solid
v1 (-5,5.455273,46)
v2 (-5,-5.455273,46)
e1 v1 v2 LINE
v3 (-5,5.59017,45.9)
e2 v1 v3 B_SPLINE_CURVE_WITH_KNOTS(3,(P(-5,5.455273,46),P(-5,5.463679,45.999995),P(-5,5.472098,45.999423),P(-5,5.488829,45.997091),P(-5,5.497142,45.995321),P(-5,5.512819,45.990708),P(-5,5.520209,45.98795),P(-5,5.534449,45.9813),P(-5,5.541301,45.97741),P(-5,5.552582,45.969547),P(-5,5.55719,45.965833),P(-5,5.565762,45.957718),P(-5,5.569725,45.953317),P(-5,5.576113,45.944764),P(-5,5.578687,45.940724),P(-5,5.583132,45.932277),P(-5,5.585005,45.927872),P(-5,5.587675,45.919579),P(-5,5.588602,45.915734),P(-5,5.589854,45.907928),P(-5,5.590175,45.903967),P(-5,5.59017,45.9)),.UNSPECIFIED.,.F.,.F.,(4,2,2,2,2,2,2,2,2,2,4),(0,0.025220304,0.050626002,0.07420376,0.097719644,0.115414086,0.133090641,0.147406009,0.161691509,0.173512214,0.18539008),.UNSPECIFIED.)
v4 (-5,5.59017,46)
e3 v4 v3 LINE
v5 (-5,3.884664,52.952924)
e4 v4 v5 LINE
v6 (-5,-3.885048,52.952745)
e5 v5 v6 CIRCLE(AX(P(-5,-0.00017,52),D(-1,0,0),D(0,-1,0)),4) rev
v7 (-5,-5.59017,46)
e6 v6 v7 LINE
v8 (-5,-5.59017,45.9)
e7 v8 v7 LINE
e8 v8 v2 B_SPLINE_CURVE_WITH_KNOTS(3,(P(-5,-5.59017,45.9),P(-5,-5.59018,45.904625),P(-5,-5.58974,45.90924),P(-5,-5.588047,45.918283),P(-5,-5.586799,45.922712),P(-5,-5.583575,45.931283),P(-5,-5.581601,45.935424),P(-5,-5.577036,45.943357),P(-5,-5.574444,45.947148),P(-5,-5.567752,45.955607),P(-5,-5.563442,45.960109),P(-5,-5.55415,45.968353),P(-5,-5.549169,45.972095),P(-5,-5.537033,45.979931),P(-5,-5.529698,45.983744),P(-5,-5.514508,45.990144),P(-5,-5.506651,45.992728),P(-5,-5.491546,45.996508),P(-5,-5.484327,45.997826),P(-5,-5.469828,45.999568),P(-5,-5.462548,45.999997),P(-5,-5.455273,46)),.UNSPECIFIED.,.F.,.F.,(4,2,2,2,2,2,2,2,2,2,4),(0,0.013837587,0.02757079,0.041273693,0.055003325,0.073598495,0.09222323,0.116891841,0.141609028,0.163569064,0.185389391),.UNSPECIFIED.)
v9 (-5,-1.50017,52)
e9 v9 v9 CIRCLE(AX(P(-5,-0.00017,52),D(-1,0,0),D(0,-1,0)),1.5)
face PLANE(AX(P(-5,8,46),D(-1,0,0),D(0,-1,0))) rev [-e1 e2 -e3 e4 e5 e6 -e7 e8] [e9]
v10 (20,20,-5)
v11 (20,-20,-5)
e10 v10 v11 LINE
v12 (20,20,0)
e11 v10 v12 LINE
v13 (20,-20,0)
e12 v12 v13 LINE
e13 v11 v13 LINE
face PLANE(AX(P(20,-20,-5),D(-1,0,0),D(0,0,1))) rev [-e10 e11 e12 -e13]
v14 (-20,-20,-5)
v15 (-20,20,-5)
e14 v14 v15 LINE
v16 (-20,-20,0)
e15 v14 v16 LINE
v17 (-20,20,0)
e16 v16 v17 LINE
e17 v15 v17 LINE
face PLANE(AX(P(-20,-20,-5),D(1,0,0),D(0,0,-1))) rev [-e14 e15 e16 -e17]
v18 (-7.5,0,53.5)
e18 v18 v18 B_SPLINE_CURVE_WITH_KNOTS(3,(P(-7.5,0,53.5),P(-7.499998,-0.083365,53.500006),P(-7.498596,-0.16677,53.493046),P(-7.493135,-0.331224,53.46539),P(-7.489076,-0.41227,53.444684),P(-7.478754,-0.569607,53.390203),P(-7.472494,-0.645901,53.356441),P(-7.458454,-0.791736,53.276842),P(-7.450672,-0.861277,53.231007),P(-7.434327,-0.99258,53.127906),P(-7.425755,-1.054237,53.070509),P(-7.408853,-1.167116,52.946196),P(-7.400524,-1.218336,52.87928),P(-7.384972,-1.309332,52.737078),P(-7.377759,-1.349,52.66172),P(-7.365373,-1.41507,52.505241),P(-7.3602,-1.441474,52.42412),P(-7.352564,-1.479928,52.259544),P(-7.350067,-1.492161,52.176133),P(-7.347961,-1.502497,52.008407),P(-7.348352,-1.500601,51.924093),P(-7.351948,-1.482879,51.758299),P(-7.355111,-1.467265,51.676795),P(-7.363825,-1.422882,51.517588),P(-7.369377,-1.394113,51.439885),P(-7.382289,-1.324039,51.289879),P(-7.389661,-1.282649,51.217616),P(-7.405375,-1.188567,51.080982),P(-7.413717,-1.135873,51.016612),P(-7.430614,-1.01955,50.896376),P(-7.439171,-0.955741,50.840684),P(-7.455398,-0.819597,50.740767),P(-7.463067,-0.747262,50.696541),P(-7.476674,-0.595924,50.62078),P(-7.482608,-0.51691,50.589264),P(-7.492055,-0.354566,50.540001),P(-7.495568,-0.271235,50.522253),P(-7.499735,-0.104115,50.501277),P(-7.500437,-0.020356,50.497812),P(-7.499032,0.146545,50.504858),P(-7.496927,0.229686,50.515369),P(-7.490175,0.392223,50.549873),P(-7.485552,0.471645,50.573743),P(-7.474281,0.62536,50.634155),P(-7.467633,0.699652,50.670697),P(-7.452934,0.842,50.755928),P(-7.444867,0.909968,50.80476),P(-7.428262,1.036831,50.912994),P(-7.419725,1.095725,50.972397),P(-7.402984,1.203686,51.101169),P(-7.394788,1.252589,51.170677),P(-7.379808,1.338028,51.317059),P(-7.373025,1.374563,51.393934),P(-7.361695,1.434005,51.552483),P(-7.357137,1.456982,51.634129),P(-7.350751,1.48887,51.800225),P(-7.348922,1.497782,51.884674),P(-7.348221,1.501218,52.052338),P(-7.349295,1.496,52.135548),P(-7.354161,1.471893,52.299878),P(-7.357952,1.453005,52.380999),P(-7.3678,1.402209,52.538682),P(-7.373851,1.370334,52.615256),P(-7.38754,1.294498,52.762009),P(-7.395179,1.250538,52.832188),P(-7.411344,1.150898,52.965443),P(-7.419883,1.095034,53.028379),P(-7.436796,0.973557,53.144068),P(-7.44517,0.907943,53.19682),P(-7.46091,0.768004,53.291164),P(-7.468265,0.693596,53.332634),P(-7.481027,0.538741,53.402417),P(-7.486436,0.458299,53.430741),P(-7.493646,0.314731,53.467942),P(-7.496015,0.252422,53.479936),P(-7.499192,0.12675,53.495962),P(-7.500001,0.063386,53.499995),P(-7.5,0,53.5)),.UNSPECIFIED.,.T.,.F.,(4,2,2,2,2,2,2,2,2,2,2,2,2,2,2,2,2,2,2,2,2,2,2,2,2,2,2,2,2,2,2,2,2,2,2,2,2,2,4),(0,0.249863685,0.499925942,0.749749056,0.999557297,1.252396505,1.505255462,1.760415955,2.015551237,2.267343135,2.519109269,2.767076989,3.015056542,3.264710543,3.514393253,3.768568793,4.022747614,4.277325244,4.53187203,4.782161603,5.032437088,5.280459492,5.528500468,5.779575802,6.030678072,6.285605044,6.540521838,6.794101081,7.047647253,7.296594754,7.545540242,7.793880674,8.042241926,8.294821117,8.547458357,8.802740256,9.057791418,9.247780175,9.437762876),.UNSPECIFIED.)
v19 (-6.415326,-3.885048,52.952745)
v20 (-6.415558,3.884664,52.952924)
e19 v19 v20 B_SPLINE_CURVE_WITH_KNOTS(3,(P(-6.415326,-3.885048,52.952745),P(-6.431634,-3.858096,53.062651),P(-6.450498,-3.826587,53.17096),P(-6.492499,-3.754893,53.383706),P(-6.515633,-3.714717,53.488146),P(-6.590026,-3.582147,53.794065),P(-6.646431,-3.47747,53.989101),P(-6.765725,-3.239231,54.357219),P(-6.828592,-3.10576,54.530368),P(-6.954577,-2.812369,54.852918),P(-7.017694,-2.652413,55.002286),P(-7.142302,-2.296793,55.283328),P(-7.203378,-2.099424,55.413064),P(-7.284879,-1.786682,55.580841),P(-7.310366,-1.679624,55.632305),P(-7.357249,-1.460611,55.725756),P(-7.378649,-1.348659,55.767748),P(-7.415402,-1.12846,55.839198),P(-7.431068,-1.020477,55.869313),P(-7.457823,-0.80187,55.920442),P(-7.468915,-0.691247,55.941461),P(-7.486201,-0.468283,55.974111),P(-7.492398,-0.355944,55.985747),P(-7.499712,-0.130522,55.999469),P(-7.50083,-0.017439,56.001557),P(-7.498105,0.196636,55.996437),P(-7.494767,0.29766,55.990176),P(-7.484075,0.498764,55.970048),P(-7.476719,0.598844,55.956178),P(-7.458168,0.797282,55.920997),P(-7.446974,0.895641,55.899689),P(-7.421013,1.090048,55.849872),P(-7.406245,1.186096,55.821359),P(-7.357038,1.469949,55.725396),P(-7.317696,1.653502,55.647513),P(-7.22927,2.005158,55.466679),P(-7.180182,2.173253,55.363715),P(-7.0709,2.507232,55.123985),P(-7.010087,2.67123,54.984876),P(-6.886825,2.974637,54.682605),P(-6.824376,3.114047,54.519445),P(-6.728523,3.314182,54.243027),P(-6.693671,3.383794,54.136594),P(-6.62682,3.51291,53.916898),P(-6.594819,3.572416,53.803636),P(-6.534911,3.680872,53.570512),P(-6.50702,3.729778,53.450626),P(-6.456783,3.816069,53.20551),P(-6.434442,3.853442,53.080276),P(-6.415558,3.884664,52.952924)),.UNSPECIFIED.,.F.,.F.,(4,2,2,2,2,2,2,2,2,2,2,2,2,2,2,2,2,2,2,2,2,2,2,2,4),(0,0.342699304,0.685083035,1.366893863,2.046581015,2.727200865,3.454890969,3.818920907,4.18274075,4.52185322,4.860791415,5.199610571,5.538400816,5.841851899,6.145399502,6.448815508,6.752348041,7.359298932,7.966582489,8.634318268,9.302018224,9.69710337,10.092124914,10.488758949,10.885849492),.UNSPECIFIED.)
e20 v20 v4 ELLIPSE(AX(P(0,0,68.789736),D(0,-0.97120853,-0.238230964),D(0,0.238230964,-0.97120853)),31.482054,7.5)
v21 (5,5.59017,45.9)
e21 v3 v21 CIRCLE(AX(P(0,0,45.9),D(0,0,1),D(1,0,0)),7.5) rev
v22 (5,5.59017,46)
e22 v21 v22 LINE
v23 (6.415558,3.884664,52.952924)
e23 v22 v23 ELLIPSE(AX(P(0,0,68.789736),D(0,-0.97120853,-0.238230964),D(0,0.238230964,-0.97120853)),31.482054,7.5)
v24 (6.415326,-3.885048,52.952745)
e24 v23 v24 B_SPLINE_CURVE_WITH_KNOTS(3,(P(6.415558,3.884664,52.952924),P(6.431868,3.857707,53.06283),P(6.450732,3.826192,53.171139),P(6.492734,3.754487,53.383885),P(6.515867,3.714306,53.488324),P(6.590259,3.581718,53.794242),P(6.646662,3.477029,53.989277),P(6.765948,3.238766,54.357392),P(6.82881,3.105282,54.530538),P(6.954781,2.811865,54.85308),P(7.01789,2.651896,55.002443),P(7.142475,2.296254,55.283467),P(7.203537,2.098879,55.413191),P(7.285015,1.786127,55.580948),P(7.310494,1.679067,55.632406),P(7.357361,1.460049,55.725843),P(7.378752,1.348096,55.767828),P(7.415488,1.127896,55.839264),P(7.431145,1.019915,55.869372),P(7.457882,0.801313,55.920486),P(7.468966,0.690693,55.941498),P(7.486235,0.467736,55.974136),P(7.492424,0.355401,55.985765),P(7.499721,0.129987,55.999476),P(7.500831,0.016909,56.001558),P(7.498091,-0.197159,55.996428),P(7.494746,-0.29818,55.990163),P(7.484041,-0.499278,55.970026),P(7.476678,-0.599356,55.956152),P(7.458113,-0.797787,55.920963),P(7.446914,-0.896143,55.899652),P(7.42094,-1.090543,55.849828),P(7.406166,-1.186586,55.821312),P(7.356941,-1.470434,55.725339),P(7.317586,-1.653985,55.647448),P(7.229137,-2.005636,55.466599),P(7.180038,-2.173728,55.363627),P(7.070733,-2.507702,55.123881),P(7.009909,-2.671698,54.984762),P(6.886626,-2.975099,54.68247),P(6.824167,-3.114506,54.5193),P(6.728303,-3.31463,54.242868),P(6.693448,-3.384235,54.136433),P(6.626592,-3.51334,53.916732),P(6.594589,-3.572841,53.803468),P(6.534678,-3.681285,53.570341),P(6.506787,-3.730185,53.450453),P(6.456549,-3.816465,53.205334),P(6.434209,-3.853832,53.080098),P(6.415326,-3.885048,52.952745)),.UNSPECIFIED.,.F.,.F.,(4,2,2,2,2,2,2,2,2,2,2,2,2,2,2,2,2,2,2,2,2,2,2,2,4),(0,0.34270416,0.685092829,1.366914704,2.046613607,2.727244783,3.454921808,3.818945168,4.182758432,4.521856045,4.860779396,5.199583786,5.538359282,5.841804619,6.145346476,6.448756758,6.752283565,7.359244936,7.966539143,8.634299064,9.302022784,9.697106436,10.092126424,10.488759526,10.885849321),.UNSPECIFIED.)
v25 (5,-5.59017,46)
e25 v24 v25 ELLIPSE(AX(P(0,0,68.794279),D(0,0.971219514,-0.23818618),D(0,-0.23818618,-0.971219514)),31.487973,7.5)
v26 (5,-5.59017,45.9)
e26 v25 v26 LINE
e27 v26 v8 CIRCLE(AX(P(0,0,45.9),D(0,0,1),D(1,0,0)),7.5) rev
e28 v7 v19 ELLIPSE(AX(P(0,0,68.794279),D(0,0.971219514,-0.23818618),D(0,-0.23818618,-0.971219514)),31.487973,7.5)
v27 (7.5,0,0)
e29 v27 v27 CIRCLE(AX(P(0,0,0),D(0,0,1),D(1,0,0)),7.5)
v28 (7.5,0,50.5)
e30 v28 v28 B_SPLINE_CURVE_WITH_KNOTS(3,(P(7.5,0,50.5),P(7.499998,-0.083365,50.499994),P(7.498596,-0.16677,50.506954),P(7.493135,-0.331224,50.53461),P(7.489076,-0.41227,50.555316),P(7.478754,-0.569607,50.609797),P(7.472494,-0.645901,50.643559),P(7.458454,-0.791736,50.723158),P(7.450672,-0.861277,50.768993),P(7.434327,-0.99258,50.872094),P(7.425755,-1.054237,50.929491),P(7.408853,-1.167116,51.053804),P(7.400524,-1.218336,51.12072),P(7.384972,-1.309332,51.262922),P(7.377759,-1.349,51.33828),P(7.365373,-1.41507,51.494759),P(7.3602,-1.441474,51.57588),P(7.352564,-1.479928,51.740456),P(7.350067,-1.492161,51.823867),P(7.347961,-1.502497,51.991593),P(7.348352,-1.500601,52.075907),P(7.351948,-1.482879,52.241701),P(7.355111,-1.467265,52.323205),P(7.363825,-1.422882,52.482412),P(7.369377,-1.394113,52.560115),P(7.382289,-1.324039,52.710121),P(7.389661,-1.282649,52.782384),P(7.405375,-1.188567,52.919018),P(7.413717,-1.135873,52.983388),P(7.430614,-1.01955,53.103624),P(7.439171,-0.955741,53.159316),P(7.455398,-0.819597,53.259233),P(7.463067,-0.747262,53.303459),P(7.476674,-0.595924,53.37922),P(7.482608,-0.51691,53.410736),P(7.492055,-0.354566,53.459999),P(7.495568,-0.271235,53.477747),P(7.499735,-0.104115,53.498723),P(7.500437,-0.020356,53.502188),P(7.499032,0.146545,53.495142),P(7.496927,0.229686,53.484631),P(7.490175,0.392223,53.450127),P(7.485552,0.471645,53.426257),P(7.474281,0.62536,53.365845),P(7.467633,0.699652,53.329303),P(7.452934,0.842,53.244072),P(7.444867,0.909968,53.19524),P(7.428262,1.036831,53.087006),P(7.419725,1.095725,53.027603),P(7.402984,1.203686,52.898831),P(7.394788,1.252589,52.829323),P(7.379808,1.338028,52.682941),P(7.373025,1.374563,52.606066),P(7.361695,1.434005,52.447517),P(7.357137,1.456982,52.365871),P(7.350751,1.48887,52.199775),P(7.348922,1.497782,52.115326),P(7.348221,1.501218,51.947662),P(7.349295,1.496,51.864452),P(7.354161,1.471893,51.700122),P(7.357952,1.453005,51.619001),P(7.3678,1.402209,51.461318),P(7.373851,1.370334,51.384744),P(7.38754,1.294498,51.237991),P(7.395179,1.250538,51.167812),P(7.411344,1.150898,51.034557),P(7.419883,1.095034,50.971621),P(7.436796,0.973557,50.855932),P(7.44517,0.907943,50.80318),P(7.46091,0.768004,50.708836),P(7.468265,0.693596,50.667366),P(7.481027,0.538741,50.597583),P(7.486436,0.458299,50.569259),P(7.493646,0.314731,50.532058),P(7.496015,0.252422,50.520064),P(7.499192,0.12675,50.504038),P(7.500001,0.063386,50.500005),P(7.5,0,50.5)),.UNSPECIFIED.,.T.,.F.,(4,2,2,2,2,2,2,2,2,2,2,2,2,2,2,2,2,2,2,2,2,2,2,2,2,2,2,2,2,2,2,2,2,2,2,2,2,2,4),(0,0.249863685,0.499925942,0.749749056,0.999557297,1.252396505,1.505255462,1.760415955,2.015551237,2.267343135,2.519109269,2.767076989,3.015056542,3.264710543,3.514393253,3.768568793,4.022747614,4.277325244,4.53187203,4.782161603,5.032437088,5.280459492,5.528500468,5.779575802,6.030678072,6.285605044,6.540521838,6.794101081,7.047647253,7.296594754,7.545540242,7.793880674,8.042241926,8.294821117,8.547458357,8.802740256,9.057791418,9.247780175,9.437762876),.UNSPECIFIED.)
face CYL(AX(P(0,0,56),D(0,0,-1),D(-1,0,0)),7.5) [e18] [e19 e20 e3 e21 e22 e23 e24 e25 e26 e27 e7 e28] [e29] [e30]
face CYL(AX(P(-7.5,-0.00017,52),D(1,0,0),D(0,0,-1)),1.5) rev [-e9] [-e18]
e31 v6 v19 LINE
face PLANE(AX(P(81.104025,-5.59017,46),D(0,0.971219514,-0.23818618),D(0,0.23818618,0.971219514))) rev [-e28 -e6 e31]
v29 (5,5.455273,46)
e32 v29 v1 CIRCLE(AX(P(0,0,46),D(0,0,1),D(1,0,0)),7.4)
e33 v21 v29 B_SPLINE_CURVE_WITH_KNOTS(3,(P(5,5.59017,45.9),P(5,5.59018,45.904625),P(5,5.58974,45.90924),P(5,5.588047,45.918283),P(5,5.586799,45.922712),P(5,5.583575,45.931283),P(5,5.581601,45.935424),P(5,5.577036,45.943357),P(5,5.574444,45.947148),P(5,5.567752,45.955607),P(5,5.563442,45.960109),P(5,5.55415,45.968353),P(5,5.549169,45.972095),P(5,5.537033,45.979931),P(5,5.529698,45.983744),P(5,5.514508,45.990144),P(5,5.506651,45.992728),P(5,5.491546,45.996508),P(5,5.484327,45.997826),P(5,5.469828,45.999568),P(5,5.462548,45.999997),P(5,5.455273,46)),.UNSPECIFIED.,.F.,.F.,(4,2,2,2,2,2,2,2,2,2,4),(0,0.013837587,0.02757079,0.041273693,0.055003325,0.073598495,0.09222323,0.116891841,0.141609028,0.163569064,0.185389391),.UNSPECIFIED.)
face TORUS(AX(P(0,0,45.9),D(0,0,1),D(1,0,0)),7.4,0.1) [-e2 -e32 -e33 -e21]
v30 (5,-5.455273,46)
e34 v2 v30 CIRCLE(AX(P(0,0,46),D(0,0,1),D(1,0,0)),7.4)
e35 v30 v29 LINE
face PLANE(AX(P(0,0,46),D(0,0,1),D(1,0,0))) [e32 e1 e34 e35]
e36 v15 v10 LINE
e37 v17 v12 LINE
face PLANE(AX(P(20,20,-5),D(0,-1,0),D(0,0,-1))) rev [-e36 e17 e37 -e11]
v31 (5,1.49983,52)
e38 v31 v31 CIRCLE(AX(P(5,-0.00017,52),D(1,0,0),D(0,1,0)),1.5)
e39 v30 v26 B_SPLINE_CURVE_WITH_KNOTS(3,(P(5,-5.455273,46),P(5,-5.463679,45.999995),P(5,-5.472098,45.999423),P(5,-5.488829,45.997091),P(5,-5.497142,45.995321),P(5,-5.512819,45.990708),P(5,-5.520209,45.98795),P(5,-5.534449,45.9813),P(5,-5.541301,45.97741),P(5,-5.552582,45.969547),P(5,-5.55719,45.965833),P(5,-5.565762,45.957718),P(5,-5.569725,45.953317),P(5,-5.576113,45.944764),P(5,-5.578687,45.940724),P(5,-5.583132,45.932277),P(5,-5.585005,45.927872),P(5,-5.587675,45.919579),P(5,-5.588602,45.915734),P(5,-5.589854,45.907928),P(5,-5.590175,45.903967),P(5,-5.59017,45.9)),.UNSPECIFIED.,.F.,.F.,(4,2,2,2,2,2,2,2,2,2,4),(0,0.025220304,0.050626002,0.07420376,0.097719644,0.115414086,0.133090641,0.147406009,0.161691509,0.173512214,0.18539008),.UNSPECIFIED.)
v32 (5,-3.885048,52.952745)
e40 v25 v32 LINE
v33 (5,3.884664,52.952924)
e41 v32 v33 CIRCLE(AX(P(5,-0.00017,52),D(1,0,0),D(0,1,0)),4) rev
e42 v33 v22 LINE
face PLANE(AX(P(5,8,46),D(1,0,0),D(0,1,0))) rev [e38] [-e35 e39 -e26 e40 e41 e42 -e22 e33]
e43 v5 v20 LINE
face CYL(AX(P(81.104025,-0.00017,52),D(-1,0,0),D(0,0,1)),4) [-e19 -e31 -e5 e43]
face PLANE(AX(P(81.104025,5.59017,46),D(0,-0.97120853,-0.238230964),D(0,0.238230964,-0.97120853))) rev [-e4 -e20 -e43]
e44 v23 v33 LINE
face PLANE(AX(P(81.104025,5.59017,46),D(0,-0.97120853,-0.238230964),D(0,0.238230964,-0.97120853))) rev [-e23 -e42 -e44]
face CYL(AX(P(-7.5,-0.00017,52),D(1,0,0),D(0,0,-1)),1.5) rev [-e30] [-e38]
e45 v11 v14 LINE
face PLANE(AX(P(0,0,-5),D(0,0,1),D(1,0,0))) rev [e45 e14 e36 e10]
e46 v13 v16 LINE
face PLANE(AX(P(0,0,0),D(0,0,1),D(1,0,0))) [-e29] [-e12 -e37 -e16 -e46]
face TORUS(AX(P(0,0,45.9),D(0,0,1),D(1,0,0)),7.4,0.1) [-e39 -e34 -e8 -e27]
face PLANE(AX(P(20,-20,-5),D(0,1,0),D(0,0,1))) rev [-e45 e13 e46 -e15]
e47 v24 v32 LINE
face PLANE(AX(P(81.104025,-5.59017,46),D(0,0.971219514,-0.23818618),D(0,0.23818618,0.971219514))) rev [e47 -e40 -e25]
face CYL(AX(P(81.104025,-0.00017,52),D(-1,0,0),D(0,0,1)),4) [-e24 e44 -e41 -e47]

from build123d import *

# Parameters (mm, degrees)
SKETCH1_R               = 7.5
BOSS_EXTRUDE1_DEPTH     = 56
SKETCH2_W               = 10
SKETCH2_H               = 16
CUT_EXTRUDE1_DEPTH      = 10
CUT_EXTRUDE4_DEPTH      = 57.995613866
CUT_EXTRUDE4_DEPTH_BACK = 57.995613866
CUT_EXTRUDE5_DEPTH      = 57.995613991
CUT_EXTRUDE5_DEPTH_BACK = 57.995613991
SKETCH4_R               = 1.5
FILLET1_R               = 0.1
SKETCH5_W               = 40
SKETCH5_H               = 40
BOSS_EXTRUDE2_DEPTH     = 5


with BuildPart() as part:
    # Sketch1 → Boss-Extrude1 (new body)
    with BuildSketch(Plane.XY):
        Circle(SKETCH1_R)
    extrude(amount=BOSS_EXTRUDE1_DEPTH)

    # Sketch2 → Cut-Extrude1 (cut)
    with BuildSketch(Plane.XY.offset(56)):
        Rectangle(SKETCH2_W, SKETCH2_H)
    extrude(amount=-CUT_EXTRUDE1_DEPTH, mode=Mode.SUBTRACT)

    # Sketch3 → Cut-Extrude4 (cut, two sides: drawn at the far end of the back side and taken through both)
    with BuildSketch(Plane(origin=(0, 0, 0), x_dir=(0, 0, -1), z_dir=(1, 0, 0)).offset(-CUT_EXTRUDE4_DEPTH_BACK)):
        with BuildLine():
            Line((-46, -114.267763227), (-46, -7.5))
            Line((-46, -7.5), (-46, -5.590169944))
            Line((-46, -5.590169944), (-52.952744721, -3.885047998))
            ThreePointArc((-52.952744721, -3.885047998), (-55.999999999, -0.000262165), (-52.952923855, 3.884664175))
            Line((-52.952923855, 3.884664175), (-46, 5.590169944))
            Line((-46, 5.590169944), (-46, 7.5))
            Line((-46, 7.5), (-46, 114.267763227))
            Line((-46, 114.267763227), (-259.535526454, 114.267763227))
            Line((-259.535526454, 114.267763227), (-259.535526454, -114.267763227))
            Line((-259.535526454, -114.267763227), (-46, -114.267763227))
        make_face()
    extrude(amount=CUT_EXTRUDE4_DEPTH + CUT_EXTRUDE4_DEPTH_BACK, mode=Mode.SUBTRACT)

    # Sketch4 → Cut-Extrude5 (cut, two sides: drawn at the far end of the back side and taken through both)
    with BuildSketch(Plane(origin=(0, 0, 0), x_dir=(0, 0, -1), z_dir=(1, 0, 0)).offset(-CUT_EXTRUDE5_DEPTH_BACK)):
        with Locations(Location((-52, -0.000169944, 0), (0, 0, 0.006491373))):
            Circle(SKETCH4_R)
    extrude(amount=CUT_EXTRUDE5_DEPTH + CUT_EXTRUDE5_DEPTH_BACK, mode=Mode.SUBTRACT)

    # Fillet1
    # the kernel refuses this fillet: 0.1 mm, written as the material it takes off along each edge
    with BuildSketch(Plane(origin=(0, 0, 46), x_dir=(0.6911452834399255, -0.7227158481580054, 0), z_dir=(0.7227158481580054, 0.6911452834399255, 0))) as fillet1_piece_1_section:
        with BuildLine():
            CenterArc((7.5 - FILLET1_R, FILLET1_R), FILLET1_R, 270, 90)
            Line((7.5 - FILLET1_R, 0), (7.5, 0))
            Line((7.5, 0), (7.5, FILLET1_R))
        make_face()
    fillet1_piece_1 = revolve(axis=Axis((0, 0, 46), (0, 0, -1)), revolution_arc=87.441672972, mode=Mode.PRIVATE)
    fillet1_piece_1 = split(fillet1_piece_1, bisect_by=Plane(origin=(5, -5.569278278, 45.983069625), z_dir=(-1, 0, 0)), keep=Keep.TOP, mode=Mode.PRIVATE)
    fillet1_piece_1 = split(fillet1_piece_1, bisect_by=Plane(origin=(-5, -5.569278278, 45.983069625), z_dir=(1, 0, 0)), keep=Keep.TOP, mode=Mode.PRIVATE)
    add(fillet1_piece_1, mode=Mode.SUBTRACT)
    with BuildSketch(Plane(origin=(0, 0, 46), x_dir=(-0.6911452834399255, 0.7227158481580054, 0), z_dir=(-0.7227158481580054, -0.6911452834399255, 0))) as fillet1_piece_2_section:
        with BuildLine():
            CenterArc((7.5 - FILLET1_R, FILLET1_R), FILLET1_R, 270, 90)
            Line((7.5 - FILLET1_R, 0), (7.5, 0))
            Line((7.5, 0), (7.5, FILLET1_R))
        make_face()
    fillet1_piece_2 = revolve(axis=Axis((0, 0, 46), (0, 0, -1)), revolution_arc=87.441672972, mode=Mode.PRIVATE)
    fillet1_piece_2 = split(fillet1_piece_2, bisect_by=Plane(origin=(5, 5.569279246, 45.98306893), z_dir=(-1, 0, 0)), keep=Keep.TOP, mode=Mode.PRIVATE)
    fillet1_piece_2 = split(fillet1_piece_2, bisect_by=Plane(origin=(-5, 5.569279246, 45.98306893), z_dir=(1, 0, 0)), keep=Keep.TOP, mode=Mode.PRIVATE)
    add(fillet1_piece_2, mode=Mode.SUBTRACT)

    # Sketch5 → Boss-Extrude2 (add)
    with BuildSketch(Plane(origin=(0, 0, 0), x_dir=(-1, 0, 0), z_dir=(0, 0, -1))):
        Rectangle(SKETCH5_W, SKETCH5_H)
    extrude(amount=BOSS_EXTRUDE2_DEPTH)


solid = part.part
